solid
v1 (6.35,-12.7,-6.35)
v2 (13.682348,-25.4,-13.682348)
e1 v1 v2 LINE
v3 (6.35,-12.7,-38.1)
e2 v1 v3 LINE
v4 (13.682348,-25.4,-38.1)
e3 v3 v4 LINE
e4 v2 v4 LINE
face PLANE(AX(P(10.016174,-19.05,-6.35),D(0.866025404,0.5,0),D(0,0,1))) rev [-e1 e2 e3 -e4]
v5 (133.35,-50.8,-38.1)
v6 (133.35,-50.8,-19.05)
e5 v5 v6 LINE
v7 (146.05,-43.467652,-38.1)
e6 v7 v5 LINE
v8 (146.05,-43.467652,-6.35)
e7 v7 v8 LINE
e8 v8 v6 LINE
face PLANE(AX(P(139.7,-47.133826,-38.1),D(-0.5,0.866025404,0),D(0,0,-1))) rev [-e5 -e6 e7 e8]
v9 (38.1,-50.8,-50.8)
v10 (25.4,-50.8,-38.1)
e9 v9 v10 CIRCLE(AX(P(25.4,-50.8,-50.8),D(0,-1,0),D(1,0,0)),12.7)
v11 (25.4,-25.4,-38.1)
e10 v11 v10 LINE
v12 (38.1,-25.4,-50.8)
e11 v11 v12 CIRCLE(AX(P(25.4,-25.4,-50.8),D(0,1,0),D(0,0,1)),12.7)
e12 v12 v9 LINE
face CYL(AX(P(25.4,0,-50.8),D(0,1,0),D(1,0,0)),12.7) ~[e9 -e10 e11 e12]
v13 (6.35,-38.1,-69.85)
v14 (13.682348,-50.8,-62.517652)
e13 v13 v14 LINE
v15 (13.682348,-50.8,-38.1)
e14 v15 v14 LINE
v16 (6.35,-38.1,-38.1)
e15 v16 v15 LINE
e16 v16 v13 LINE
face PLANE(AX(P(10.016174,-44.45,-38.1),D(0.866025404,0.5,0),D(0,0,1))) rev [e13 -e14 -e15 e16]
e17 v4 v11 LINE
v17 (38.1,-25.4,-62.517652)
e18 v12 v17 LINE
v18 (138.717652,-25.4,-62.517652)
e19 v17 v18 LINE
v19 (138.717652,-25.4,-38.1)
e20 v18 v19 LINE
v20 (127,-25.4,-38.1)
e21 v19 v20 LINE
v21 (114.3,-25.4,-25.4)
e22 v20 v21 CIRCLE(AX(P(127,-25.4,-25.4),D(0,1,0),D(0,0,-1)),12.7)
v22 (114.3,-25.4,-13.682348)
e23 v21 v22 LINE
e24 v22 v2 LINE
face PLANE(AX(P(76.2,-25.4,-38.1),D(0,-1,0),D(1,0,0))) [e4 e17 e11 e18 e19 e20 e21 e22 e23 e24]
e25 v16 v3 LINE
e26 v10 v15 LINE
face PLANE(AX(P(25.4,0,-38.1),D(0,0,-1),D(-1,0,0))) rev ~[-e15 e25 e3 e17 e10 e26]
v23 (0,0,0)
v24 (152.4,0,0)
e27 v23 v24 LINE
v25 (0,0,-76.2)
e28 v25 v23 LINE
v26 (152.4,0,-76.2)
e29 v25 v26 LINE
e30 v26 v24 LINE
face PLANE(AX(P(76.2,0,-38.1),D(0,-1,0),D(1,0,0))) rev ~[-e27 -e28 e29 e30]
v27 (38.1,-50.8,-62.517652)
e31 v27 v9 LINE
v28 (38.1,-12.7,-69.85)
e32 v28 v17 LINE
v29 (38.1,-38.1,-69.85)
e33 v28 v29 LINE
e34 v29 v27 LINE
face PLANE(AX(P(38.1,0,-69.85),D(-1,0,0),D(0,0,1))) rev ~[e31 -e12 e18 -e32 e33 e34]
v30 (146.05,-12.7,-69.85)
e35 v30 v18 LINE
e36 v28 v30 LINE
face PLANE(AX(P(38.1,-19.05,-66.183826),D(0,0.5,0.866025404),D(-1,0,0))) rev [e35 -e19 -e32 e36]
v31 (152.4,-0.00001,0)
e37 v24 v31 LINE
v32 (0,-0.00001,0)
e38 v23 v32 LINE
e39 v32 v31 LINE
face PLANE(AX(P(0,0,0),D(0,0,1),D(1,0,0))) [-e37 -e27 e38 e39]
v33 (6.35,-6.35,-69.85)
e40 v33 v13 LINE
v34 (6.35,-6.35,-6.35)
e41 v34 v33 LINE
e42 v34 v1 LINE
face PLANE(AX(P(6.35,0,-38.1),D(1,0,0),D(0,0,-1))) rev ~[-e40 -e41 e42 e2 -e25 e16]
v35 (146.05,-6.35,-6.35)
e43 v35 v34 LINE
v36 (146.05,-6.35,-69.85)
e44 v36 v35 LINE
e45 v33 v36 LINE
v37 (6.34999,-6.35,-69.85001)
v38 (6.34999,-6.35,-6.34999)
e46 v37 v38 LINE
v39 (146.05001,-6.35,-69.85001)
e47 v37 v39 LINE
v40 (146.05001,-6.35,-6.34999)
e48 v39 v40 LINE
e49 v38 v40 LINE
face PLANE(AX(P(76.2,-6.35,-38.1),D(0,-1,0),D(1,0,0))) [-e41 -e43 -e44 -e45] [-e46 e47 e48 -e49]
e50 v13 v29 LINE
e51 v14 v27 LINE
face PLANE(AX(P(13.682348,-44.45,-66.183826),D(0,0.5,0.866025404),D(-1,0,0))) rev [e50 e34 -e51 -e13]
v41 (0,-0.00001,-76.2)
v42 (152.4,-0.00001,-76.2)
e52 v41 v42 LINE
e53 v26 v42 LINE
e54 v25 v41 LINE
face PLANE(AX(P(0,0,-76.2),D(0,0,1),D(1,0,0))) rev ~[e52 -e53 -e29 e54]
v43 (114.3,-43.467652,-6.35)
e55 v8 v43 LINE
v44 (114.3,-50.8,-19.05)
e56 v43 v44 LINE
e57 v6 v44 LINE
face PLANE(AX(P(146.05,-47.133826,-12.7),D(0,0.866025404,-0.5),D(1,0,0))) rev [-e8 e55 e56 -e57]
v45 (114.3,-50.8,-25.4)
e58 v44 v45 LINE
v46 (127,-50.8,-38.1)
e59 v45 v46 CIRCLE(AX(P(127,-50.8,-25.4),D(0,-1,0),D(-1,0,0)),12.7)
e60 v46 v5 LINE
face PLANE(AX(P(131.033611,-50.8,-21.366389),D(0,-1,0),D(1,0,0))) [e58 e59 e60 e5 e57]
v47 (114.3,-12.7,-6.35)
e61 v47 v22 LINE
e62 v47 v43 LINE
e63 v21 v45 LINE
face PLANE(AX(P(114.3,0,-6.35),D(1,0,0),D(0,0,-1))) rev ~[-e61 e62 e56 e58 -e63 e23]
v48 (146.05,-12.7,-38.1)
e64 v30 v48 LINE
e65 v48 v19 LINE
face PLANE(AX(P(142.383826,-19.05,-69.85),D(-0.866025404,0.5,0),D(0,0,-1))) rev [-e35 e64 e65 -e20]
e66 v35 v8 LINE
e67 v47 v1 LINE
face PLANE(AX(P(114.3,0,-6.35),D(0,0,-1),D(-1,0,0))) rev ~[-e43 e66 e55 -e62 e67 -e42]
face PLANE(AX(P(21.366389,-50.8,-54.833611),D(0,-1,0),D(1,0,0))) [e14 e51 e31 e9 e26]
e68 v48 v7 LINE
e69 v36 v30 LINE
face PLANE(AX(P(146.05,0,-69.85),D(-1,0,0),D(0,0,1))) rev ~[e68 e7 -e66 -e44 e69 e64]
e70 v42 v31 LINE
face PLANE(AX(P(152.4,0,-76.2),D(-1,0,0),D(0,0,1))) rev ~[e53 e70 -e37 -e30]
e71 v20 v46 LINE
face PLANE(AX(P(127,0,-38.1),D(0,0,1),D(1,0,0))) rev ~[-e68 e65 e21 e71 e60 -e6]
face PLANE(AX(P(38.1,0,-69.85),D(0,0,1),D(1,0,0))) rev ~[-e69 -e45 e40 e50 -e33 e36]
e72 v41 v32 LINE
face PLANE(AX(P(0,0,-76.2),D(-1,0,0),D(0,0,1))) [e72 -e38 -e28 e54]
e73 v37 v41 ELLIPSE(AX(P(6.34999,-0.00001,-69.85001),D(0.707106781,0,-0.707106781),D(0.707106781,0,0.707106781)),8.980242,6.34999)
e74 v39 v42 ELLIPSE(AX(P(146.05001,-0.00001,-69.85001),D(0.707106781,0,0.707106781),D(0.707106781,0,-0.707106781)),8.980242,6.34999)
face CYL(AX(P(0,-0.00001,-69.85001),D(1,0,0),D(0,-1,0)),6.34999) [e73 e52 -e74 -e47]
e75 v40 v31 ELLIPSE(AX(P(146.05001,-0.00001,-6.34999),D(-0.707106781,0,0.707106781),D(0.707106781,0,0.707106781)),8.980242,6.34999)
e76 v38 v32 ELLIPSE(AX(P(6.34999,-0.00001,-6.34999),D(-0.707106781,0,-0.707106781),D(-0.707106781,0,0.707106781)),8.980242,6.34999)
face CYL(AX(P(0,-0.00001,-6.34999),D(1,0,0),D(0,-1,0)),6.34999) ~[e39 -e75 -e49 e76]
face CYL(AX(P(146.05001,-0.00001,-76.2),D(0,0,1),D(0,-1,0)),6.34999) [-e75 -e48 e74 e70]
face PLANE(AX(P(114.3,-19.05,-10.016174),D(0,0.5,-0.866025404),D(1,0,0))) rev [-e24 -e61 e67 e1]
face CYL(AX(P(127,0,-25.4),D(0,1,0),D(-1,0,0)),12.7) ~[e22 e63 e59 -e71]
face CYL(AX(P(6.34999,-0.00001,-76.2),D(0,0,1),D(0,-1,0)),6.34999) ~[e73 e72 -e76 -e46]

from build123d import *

# Parameters (mm, degrees)
F1_DEPTH    = 25.4
F0_W        = 152.4
F0_H        = 76.2
F2_DEPTH    = 6.35
F3_DEPTH    = 50.8
F4_R        = 6.34999
F5_C1_SIZE2 = 7.3323484187
F5_C1_SIZE  = 12.7
F5_C2_SIZE2 = 7.3323484187
F5_C2_SIZE  = 12.7
F5_C3_SIZE2 = 12.7
F5_C3_SIZE  = 7.3323484187
F5_C4_SIZE2 = 7.3323484187
F5_C4_SIZE  = 12.7
F5_C5_SIZE2 = 7.3323484187
F5_C5_SIZE  = 12.7
F5_C6_SIZE2 = 12.7
F5_C6_SIZE  = 7.3323484187
F5_C7_SIZE2 = 7.3323484187
F5_C7_SIZE  = 12.7
F5_C8_SIZE2 = 7.3323484187
F5_C8_SIZE  = 12.7


# Not quite as in the source:
# - a fillet or chamfer is up to 0.001 mm smaller than in the source, because OpenCascade refuses the exact size


with BuildPart() as f1:
    # F0 (on Front) → F1 (new body)
    with BuildSketch(Plane.XZ):
        with BuildLine():
            Line((114.3, -6.35), (6.35, -6.35))
            Line((6.35, -6.35), (6.35, -38.1))
            Line((6.35, -38.1), (25.4, -38.1))
            ThreePointArc((25.4, -38.1), (34.3802561211, -41.8197438789), (38.1, -50.8))
            Line((38.1, -50.8), (38.1, -69.85))
            Line((38.1, -69.85), (146.05, -69.85))
            Line((146.05, -69.85), (146.05, -38.1))
            Line((146.05, -38.1), (127, -38.1))
            ThreePointArc((127, -38.1), (118.0197438789, -34.3802561211), (114.3, -25.4))
            Line((114.3, -25.4), (114.3, -6.35))
        make_face()
    extrude(amount=F1_DEPTH)

    # F0 (on Front) → F2 (join)
    with BuildSketch(Plane.XZ):
        with Locations((76.2, -38.1)):
            Rectangle(F0_W, F0_H)
        Polygon((6.35, -38.1), (6.35, -6.35), (114.3, -6.35), (146.05, -6.35), (146.05, -38.1), (146.05, -69.85), (38.1, -69.85), (6.35, -69.85), align=None, mode=Mode.SUBTRACT)
    extrude(amount=F2_DEPTH)

    # F0 (on Front) → F3 (join)
    with BuildSketch(Plane.XZ):
        with BuildLine():
            Line((25.4, -38.1), (6.35, -38.1))
            Line((6.35, -38.1), (6.35, -69.85))
            Line((6.35, -69.85), (38.1, -69.85))
            Line((38.1, -69.85), (38.1, -50.8))
            ThreePointArc((38.1, -50.8), (34.3802561211, -41.8197438789), (25.4, -38.1))
        make_face()
        with BuildLine():
            Line((146.05, -6.35), (114.3, -6.35))
            Line((114.3, -6.35), (114.3, -25.4))
            ThreePointArc((114.3, -25.4), (118.0197438789, -34.3802561211), (127, -38.1))
            Line((127, -38.1), (146.05, -38.1))
            Line((146.05, -38.1), (146.05, -6.35))
        make_face()
    extrude(amount=F3_DEPTH)

    # F4 (radius 6.35 in the source; OpenCascade refuses exactly that, so slightly less here)
    f4_edges = [f1.edges().sort_by_distance(p)[0] for p in [
        (76.2, -6.35, -76.2),
        (0, -6.35, -38.1),
        (152.4, -6.35, -38.1),
        (76.2, -6.35, 0),
    ]]
    fillet(f4_edges, radius=F4_R)

    # F5: chamfer of 12.7 x 7.3323484187 on 8 edges, made by hand

    # F5_c1
    f5_c1_edges = [f1.edges().sort_by_distance(p)[0] for p in [
        (6.35, -25.4, -22.225),
    ]]
    f5_c1_side = f1.faces().sort_by_distance((6.35, -25.2533530316, -22.225))[0]
    chamfer(f5_c1_edges, length=F5_C1_SIZE, length2=F5_C1_SIZE2, reference=f5_c1_side)

    # F5_c2
    f5_c2_edges = [f1.edges().sort_by_distance(p)[0] for p in [
        (6.35, -50.8, -53.975),
    ]]
    f5_c2_side = f1.faces().sort_by_distance((6.35, -50.6533530316, -53.975))[0]
    chamfer(f5_c2_edges, length=F5_C2_SIZE, length2=F5_C2_SIZE2, reference=f5_c2_side)

    # F5_c3
    f5_c3_edges = [f1.edges().sort_by_distance(p)[0] for p in [
        (130.175, -50.8, -6.35),
    ]]
    f5_c3_side = f1.faces().sort_by_distance((130.175, -50.6533530316, -6.35))[0]
    chamfer(f5_c3_edges, length=F5_C3_SIZE, length2=F5_C3_SIZE2, reference=f5_c3_side)

    # F5_c4
    f5_c4_edges = [f1.edges().sort_by_distance(p)[0] for p in [
        (63.9911742094, -25.4, -6.35),
    ]]
    f5_c4_side = f1.faces().sort_by_distance((63.9911742094, -25.2533530316, -6.35))[0]
    chamfer(f5_c4_edges, length=F5_C4_SIZE, length2=F5_C4_SIZE2, reference=f5_c4_side)

    # F5_c5
    f5_c5_edges = [f1.edges().sort_by_distance(p)[0] for p in [
        (146.05, -25.4, -53.975),
    ]]
    f5_c5_side = f1.faces().sort_by_distance((146.05, -25.2533530316, -53.975))[0]
    chamfer(f5_c5_edges, length=F5_C5_SIZE, length2=F5_C5_SIZE2, reference=f5_c5_side)

    # F5_c6
    f5_c6_edges = [f1.edges().sort_by_distance(p)[0] for p in [
        (146.05, -50.8, -28.575),
    ]]
    f5_c6_side = f1.faces().sort_by_distance((146.05, -50.6533530316, -28.575))[0]
    chamfer(f5_c6_edges, length=F5_C6_SIZE, length2=F5_C6_SIZE2, reference=f5_c6_side)

    # F5_c7
    f5_c7_edges = [f1.edges().sort_by_distance(p)[0] for p in [
        (25.8911742094, -50.8, -69.85),
    ]]
    f5_c7_side = f1.faces().sort_by_distance((25.8911742094, -50.6533530316, -69.85))[0]
    chamfer(f5_c7_edges, length=F5_C7_SIZE, length2=F5_C7_SIZE2, reference=f5_c7_side)

    # F5_c8
    f5_c8_edges = [f1.edges().sort_by_distance(p)[0] for p in [
        (88.4088257906, -25.4, -69.85),
    ]]
    f5_c8_side = f1.faces().sort_by_distance((88.4088257906, -25.2533530316, -69.85))[0]
    chamfer(f5_c8_edges, length=F5_C8_SIZE, length2=F5_C8_SIZE2, reference=f5_c8_side)


solid = f1.part
